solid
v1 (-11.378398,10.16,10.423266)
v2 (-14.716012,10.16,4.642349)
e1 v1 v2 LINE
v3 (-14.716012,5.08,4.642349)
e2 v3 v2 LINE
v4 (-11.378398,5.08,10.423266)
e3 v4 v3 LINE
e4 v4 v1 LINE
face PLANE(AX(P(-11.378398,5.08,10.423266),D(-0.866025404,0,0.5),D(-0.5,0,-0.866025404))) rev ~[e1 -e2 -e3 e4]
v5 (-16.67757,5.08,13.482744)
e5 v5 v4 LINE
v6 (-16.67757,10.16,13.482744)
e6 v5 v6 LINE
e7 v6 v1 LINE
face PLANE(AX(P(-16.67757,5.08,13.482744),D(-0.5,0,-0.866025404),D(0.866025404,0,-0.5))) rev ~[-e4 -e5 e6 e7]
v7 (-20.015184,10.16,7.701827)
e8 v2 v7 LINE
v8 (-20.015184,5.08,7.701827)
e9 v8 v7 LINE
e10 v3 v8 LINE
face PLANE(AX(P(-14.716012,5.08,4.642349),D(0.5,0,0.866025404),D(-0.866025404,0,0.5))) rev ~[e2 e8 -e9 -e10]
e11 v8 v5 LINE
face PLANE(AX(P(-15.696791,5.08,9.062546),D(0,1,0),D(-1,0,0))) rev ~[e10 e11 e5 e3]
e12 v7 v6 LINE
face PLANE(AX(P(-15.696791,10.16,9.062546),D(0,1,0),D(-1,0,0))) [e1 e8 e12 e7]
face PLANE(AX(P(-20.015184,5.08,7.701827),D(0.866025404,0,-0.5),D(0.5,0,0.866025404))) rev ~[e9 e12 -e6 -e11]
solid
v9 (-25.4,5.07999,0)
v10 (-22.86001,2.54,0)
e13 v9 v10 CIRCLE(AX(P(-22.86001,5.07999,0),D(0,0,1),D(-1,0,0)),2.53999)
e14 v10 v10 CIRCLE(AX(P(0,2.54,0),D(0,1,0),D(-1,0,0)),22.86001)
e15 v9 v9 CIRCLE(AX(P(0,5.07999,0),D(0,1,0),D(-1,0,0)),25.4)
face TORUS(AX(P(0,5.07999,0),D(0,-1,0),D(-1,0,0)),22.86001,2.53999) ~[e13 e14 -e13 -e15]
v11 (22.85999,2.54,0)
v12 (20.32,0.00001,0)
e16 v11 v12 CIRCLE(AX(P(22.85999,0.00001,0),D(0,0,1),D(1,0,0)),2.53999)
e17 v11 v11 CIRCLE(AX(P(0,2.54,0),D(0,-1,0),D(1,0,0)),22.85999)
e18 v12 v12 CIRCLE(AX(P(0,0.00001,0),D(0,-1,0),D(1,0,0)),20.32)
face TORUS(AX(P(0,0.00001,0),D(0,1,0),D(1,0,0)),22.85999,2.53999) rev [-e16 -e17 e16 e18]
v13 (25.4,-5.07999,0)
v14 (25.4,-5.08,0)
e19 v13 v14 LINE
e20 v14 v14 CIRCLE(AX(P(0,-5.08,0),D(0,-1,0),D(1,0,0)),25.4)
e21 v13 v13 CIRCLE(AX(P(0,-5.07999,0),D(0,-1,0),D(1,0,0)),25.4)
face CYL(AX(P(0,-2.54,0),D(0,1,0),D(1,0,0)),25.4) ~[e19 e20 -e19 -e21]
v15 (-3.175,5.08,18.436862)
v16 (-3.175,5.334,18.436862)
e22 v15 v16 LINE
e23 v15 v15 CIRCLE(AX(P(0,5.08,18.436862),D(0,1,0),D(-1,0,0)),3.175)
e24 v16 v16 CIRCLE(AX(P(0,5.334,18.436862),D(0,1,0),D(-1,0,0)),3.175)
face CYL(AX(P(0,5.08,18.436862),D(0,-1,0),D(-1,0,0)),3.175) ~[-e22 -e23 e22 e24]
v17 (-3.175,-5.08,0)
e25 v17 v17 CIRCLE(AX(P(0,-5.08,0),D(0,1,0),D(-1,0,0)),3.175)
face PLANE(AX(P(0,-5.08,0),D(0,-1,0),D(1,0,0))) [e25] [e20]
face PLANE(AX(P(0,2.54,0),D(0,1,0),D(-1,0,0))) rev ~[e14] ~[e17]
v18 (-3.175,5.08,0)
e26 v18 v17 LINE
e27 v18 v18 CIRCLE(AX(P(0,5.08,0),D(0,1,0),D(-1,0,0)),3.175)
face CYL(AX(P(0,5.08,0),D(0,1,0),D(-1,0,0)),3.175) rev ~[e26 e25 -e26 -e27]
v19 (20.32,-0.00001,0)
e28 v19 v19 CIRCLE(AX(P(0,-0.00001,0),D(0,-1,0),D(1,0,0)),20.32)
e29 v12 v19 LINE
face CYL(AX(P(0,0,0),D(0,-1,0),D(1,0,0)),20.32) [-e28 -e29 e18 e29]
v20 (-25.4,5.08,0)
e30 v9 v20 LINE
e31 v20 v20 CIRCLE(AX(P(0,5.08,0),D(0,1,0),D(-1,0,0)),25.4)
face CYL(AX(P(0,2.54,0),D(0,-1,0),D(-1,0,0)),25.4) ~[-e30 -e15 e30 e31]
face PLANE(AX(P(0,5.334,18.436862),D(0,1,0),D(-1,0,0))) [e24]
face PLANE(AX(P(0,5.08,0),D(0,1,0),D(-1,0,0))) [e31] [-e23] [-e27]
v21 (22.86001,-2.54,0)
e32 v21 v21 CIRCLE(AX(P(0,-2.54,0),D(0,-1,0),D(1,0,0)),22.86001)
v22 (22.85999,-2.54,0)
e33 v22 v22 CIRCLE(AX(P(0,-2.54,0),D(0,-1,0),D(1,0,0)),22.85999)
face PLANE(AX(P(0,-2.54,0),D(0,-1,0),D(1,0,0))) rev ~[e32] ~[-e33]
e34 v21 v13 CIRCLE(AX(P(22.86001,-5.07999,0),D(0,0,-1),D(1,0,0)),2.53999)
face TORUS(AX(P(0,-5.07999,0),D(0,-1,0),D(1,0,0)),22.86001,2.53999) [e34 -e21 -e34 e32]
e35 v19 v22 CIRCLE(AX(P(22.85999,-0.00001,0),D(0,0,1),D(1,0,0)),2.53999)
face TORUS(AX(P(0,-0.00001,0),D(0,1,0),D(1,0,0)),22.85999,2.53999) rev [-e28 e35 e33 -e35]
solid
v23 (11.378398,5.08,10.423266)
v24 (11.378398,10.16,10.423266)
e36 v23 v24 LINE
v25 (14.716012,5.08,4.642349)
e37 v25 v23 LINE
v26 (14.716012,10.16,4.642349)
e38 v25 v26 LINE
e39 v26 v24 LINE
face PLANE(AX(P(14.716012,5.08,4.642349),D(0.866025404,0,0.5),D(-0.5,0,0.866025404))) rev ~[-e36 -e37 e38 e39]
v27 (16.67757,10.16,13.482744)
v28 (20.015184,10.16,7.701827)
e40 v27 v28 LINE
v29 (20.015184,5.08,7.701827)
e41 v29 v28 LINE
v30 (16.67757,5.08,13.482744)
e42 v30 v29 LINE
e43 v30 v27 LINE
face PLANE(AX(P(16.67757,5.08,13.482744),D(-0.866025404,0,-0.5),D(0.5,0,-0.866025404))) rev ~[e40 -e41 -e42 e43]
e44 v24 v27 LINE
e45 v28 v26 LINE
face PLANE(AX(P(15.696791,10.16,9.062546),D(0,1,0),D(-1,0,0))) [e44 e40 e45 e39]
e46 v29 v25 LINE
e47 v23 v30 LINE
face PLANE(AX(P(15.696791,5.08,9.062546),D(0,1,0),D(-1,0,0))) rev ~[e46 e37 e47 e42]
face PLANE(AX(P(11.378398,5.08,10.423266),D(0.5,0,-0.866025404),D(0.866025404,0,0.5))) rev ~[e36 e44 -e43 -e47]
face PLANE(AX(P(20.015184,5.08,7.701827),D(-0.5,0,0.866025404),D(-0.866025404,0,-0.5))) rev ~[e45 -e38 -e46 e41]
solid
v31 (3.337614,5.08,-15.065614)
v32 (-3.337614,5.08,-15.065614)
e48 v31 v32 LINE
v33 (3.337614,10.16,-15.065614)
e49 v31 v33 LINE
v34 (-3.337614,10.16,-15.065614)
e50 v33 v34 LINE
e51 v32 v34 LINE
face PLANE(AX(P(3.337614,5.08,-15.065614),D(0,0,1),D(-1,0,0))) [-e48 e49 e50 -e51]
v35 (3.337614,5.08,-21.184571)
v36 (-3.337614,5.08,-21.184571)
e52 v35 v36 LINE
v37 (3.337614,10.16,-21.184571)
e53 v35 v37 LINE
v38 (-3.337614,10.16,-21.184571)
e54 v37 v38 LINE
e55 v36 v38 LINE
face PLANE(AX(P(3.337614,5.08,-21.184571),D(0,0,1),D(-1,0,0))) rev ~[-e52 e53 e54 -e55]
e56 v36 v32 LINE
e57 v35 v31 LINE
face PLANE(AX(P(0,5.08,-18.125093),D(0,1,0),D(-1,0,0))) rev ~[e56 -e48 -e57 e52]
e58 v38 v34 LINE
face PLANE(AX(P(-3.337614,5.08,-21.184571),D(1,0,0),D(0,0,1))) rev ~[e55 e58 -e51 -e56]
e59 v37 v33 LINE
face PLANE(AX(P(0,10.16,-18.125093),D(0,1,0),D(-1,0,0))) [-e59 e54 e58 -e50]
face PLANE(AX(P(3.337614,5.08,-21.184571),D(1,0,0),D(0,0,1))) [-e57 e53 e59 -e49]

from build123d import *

# Parameters (mm, degrees)
F0_R      = 20.32
F1_DEPTH  = 2.54
F2_R      = 25.4
F3_DEPTH  = 2.54
F4_R      = 25.4
F5_DEPTH  = 2.54
F6_R      = 2.53999
F7_R      = 3.175
F8_DEPTH  = 25.4
F9_DEPTH  = 0.254
F11_DEPTH = 5.08
F10_W     = 6.6752280109
F10_H     = 6.1189569533


# Not quite as in the source:
# - a fillet or chamfer is up to 0.001 mm smaller than in the source, because OpenCascade refuses the exact size


with BuildPart() as f1:
    # F0 (on Front) → F1 (new body, symmetric)
    with BuildSketch(Plane.XZ):
        Circle(F0_R)
    extrude(amount=F1_DEPTH, both=True)

    # F2 (on face) → F3 (join)
    with BuildSketch(Plane.XZ.offset(2.54)):
        Circle(F2_R)
    extrude(amount=F3_DEPTH)

    # F4 (on face) → F5 (join)
    with BuildSketch(Plane(origin=(0, 2.54, 0), x_dir=(-1, 0, 0), z_dir=(0, 1, 0))):
        Circle(F4_R)
    extrude(amount=F5_DEPTH)

    # F6 (radius 2.54 in the source; OpenCascade refuses exactly that, so slightly less here)
    f6_edges = [f1.edges().sort_by_distance(p)[0] for p in [
        (-20.32, 2.54, 0),
        (20.32, 0, 0),
        (-20.32, -2.54, 0),
        (25.4, 2.54, 0),
        (-25.4, -2.54, 0),
    ]]
    fillet(f6_edges, radius=F6_R)

    # F7 (on face) → F8 (cut)
    with BuildSketch(Plane(origin=(0, 5.08, 0), x_dir=(-1, 0, 0), z_dir=(0, 1, 0))):
        Circle(F7_R)
    extrude(amount=-F8_DEPTH, mode=Mode.SUBTRACT)

    # F7 (on face) → F9 (join)
    with BuildSketch(Plane(origin=(0, 5.08, 0), x_dir=(-1, 0, 0), z_dir=(0, 1, 0))):
        with Locations((0, 18.4368621558)):
            Circle(F7_R)
    extrude(amount=F9_DEPTH)


with BuildPart() as f11:
    # F10 (on face) → F11 (new body)
    with BuildSketch(Plane(origin=(0, 5.08, 0), x_dir=(-1, 0, 0), z_dir=(0, 1, 0))):
        Polygon((20.0151837326, 7.7018270269), (16.6775697272, 13.4827440604), (11.378397561, 10.4232655838), (14.7160115664, 4.6423485503), align=None)
    extrude(amount=F11_DEPTH)


with BuildPart() as f11b:
    # F10 (on face) → F11, piece 2 (new body)
    with BuildSketch(Plane(origin=(0, 5.08, 0), x_dir=(-1, 0, 0), z_dir=(0, 1, 0))):
        with Locations((0, -18.1250926107)):
            Rectangle(F10_W, F10_H)
    extrude(amount=F11_DEPTH)


with BuildPart() as f11c:
    # F10 (on face) → F11, piece 3 (new body)
    with BuildSketch(Plane(origin=(0, 5.08, 0), x_dir=(-1, 0, 0), z_dir=(0, 1, 0))):
        Polygon((-16.6775697272, 13.4827440604), (-20.0151837326, 7.7018270269), (-14.7160115664, 4.6423485503), (-11.378397561, 10.4232655838), align=None)
    extrude(amount=F11_DEPTH)


solid = Compound([f1.part, f11.part, f11b.part, f11c.part])
